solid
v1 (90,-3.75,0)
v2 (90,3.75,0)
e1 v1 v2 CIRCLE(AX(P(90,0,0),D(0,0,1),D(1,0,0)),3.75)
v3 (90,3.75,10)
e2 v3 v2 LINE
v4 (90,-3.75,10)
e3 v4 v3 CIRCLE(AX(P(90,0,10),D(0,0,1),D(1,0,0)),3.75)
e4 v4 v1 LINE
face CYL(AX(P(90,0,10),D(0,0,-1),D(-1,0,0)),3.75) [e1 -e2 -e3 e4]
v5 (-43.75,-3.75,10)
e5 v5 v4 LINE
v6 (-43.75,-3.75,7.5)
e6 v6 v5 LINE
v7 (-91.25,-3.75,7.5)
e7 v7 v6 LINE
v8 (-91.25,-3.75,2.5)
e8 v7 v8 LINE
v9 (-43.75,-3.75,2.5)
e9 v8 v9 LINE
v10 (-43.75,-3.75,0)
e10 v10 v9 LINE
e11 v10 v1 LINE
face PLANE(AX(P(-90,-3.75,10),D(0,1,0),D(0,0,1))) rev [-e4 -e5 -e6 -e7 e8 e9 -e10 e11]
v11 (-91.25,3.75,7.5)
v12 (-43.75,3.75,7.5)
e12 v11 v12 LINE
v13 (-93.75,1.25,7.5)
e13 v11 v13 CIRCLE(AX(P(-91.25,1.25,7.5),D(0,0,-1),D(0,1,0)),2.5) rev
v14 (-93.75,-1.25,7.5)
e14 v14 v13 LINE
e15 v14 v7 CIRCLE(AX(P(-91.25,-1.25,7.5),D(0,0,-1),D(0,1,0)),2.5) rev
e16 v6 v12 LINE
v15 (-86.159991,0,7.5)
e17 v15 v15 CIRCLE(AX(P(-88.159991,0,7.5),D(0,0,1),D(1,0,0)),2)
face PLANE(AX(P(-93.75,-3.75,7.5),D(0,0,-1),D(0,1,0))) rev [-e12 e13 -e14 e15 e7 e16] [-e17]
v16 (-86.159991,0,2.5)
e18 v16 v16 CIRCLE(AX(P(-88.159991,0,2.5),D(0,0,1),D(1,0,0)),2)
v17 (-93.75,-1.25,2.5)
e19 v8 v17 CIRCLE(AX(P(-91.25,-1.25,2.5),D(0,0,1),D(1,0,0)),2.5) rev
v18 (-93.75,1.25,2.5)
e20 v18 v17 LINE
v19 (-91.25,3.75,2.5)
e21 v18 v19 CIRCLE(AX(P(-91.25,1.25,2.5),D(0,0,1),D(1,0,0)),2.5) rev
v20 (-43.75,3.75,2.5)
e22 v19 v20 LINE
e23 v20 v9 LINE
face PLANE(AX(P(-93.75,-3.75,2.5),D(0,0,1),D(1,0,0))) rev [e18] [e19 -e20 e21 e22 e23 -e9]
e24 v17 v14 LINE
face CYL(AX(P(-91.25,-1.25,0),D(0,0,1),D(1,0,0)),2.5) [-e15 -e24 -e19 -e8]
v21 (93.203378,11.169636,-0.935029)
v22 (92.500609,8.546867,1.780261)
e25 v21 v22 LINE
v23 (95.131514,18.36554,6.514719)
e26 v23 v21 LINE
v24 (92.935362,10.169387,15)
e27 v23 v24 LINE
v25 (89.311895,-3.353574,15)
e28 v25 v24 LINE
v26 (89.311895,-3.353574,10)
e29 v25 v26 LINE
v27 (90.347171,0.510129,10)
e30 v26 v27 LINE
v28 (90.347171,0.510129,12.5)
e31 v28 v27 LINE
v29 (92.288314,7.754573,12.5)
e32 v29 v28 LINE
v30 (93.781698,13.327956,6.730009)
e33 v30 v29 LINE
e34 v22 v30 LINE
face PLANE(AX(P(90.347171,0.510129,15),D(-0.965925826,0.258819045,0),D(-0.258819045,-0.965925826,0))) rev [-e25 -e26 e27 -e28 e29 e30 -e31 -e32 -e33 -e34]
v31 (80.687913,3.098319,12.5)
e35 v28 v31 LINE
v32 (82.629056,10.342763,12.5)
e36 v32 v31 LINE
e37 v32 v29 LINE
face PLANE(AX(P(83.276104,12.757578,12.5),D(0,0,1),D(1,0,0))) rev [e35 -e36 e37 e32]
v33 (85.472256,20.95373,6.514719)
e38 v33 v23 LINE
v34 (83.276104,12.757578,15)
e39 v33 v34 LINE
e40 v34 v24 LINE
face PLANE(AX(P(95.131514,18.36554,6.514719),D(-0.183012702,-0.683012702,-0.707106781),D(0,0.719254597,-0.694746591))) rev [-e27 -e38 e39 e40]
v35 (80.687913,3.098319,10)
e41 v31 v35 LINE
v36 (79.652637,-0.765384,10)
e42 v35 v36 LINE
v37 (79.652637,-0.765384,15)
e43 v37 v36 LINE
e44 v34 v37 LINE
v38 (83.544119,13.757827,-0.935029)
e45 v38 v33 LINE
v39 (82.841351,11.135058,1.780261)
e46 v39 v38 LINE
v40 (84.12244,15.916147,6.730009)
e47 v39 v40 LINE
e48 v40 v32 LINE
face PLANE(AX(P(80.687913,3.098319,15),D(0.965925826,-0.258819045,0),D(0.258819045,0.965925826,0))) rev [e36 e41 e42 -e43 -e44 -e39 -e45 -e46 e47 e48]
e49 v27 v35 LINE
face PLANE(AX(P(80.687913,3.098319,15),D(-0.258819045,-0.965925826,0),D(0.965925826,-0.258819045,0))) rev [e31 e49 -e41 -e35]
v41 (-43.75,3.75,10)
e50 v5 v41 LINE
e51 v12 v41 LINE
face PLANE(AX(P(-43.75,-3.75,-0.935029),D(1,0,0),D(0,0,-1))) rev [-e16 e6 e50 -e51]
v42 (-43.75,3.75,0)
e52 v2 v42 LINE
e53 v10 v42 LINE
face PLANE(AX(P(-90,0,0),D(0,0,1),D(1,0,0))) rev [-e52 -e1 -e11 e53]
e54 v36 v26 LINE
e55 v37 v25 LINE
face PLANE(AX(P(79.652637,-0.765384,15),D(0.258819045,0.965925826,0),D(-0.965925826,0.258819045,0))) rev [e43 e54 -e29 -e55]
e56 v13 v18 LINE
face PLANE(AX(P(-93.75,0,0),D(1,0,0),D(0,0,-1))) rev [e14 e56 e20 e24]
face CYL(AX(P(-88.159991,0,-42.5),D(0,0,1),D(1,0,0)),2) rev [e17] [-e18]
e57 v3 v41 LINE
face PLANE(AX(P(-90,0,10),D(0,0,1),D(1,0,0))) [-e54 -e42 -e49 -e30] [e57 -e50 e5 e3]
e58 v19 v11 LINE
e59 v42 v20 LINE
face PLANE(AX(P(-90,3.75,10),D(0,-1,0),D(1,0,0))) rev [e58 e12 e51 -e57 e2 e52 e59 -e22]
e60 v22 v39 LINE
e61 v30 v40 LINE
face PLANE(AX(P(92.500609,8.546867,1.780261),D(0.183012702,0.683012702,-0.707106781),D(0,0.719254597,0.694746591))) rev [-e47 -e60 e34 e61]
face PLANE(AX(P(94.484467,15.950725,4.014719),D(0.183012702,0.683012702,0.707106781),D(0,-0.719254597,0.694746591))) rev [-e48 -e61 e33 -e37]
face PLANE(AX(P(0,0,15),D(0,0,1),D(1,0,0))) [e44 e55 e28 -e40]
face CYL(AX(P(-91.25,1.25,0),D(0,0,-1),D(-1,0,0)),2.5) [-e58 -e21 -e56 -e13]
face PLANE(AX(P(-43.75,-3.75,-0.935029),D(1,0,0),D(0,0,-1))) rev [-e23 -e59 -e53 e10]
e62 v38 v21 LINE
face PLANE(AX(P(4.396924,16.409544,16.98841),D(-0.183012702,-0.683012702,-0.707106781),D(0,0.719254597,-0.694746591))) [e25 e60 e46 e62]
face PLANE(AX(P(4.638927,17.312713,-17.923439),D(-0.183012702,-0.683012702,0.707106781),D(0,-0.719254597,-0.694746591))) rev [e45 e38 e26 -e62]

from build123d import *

# Parameters (mm, degrees)
SKETCH1_R            = 2
BOSS_EXTRUDE1_DEPTH  = 10
BOSS_EXTRUDE2_DEPTH  = 5
SKETCH11_W           = 10
SKETCH11_H           = 2.5
BOSS_EXTRUDE9_DEPTH  = 10
CHAMFER4_SIZE        = 2.5
BOSS_EXTRUDE10_DEPTH = 12
BOSS_EXTRUDE11_DEPTH = 7
SKETCH14_W           = 37.56586606
SKETCH14_H           = 7.5
CUT_EXTRUDE2_DEPTH   = 99.023663822
SKETCH15_W           = 5
SKETCH15_H           = 7.5
BOSS_EXTRUDE12_DEPTH = 50
FILLET1_R            = 2.5
FILLET2_R            = 2.5
SKETCH16_R           = 2
CUT_EXTRUDE3_DEPTH   = 50


with BuildPart() as part:
    # Sketch1 → Boss-Extrude1 (new body)
    with BuildSketch(Plane.XY):
        with BuildLine():
            Line((-90, 3.75), (90, 3.75))
            ThreePointArc((90, 3.75), (93.75, 0), (90, -3.75))
            Line((90, -3.75), (-90, -3.75))
            ThreePointArc((-90, -3.75), (-93.75, 0), (-90, 3.75))
        make_face()
        with Locations((-90, 0)):
            Circle(SKETCH1_R, mode=Mode.SUBTRACT)
    extrude(amount=BOSS_EXTRUDE1_DEPTH)

    # Sketch2 → Boss-Extrude2 (add)
    with BuildSketch(Plane.XY.offset(10)):
        Polygon((80.687913142, 3.098319394), (90.347171405, 0.510128943), (89.311895225, -3.353574362), (79.652636962, -0.765383911), align=None)
    extrude(amount=BOSS_EXTRUDE2_DEPTH)

    # Sketch11 → Boss-Extrude9 (add)
    with BuildSketch(Plane(origin=(6.17964514, 23.062749635, 0), x_dir=(0.9659258262890681, -0.25881904510252146, 0), z_dir=(0.25881904510252146, 0.9659258262890681, 0))):
        with Locations((82.136635107, -13.75)):
            Rectangle(SKETCH11_W, SKETCH11_H)
    extrude(amount=BOSS_EXTRUDE9_DEPTH)

    # Chamfer4
    chamfer4_edges = [part.edges().sort_by_distance(p)[0] for p in [
        (88.105732725, 11.463482432, 12.5),
    ]]
    chamfer(chamfer4_edges, length=CHAMFER4_SIZE - 0.0001)  # a hair under: the kernel refuses the full size

    # Sketch12 → Boss-Extrude10 (add)
    with BuildSketch(Plane(origin=(2.442774957, 9.116560252, -9.438157676), x_dir=(-0.9831105418930532, 0.12706287081893997, -0.1317144231965381), z_dir=(0.18301270189222077, 0.683012701892222, -0.7071067811865448))):
        Polygon((-91.390726655, 14.25109763), (-81.565745121, 16.113820866), (-82.224317237, 19.5874764), (-92.049298771, 17.724753164), align=None)
    extrude(amount=BOSS_EXTRUDE10_DEPTH)

    # Sketch13 → Boss-Extrude11 (add)
    with BuildSketch(Plane(origin=(5.678013021, 21.19063308, 21.938157676), x_dir=(-0.9831105418930535, 0.1270628708189395, 0.13171442319653667), z_dir=(-0.18301270189221938, -0.6830127018922167, -0.70710678118655))):
        Polygon((-90.333133958, 8.672797801), (-80.508152424, 10.535521038), (-79.792866702, 6.762728129), (-89.617848236, 4.900004892), align=None)
    extrude(amount=BOSS_EXTRUDE11_DEPTH)

    # Sketch14 → Cut-Extrude2 (cut, through all)
    with BuildSketch(Plane.XY.offset(10)):
        with Locations((-62.53293303, 0)):
            Rectangle(SKETCH14_W, SKETCH14_H)
    extrude(amount=-CUT_EXTRUDE2_DEPTH, mode=Mode.SUBTRACT)


with BuildPart() as body_2:
    # of the pieces the cut leaves, the one that is kept (cut_extrude2_keep)
    add(part.part.solids().sort_by_distance((79.652636962, -0.765383911, 15))[0])

    # Sketch15 → Boss-Extrude12 (add)
    with BuildSketch(Plane.ZY.offset(43.75)):
        with Locations((5, 0)):
            Rectangle(SKETCH15_W, SKETCH15_H)
    extrude(amount=BOSS_EXTRUDE12_DEPTH)

    # Fillet1
    fillet1_edges = [body_2.edges().sort_by_distance(p)[0] for p in [
        (-93.75, 3.75, 5),
    ]]
    fillet(fillet1_edges, radius=FILLET1_R)

    # Fillet2
    fillet2_edges = [body_2.edges().sort_by_distance(p)[0] for p in [
        (-93.75, -3.75, 5),
    ]]
    fillet(fillet2_edges, radius=FILLET2_R)

    # Sketch16 → Cut-Extrude3 (cut)
    with BuildSketch(Plane.XY.offset(7.5)):
        with Locations((-88.159990551, 0)):
            Circle(SKETCH16_R)
    extrude(amount=-CUT_EXTRUDE3_DEPTH, mode=Mode.SUBTRACT)


solid = body_2.part
